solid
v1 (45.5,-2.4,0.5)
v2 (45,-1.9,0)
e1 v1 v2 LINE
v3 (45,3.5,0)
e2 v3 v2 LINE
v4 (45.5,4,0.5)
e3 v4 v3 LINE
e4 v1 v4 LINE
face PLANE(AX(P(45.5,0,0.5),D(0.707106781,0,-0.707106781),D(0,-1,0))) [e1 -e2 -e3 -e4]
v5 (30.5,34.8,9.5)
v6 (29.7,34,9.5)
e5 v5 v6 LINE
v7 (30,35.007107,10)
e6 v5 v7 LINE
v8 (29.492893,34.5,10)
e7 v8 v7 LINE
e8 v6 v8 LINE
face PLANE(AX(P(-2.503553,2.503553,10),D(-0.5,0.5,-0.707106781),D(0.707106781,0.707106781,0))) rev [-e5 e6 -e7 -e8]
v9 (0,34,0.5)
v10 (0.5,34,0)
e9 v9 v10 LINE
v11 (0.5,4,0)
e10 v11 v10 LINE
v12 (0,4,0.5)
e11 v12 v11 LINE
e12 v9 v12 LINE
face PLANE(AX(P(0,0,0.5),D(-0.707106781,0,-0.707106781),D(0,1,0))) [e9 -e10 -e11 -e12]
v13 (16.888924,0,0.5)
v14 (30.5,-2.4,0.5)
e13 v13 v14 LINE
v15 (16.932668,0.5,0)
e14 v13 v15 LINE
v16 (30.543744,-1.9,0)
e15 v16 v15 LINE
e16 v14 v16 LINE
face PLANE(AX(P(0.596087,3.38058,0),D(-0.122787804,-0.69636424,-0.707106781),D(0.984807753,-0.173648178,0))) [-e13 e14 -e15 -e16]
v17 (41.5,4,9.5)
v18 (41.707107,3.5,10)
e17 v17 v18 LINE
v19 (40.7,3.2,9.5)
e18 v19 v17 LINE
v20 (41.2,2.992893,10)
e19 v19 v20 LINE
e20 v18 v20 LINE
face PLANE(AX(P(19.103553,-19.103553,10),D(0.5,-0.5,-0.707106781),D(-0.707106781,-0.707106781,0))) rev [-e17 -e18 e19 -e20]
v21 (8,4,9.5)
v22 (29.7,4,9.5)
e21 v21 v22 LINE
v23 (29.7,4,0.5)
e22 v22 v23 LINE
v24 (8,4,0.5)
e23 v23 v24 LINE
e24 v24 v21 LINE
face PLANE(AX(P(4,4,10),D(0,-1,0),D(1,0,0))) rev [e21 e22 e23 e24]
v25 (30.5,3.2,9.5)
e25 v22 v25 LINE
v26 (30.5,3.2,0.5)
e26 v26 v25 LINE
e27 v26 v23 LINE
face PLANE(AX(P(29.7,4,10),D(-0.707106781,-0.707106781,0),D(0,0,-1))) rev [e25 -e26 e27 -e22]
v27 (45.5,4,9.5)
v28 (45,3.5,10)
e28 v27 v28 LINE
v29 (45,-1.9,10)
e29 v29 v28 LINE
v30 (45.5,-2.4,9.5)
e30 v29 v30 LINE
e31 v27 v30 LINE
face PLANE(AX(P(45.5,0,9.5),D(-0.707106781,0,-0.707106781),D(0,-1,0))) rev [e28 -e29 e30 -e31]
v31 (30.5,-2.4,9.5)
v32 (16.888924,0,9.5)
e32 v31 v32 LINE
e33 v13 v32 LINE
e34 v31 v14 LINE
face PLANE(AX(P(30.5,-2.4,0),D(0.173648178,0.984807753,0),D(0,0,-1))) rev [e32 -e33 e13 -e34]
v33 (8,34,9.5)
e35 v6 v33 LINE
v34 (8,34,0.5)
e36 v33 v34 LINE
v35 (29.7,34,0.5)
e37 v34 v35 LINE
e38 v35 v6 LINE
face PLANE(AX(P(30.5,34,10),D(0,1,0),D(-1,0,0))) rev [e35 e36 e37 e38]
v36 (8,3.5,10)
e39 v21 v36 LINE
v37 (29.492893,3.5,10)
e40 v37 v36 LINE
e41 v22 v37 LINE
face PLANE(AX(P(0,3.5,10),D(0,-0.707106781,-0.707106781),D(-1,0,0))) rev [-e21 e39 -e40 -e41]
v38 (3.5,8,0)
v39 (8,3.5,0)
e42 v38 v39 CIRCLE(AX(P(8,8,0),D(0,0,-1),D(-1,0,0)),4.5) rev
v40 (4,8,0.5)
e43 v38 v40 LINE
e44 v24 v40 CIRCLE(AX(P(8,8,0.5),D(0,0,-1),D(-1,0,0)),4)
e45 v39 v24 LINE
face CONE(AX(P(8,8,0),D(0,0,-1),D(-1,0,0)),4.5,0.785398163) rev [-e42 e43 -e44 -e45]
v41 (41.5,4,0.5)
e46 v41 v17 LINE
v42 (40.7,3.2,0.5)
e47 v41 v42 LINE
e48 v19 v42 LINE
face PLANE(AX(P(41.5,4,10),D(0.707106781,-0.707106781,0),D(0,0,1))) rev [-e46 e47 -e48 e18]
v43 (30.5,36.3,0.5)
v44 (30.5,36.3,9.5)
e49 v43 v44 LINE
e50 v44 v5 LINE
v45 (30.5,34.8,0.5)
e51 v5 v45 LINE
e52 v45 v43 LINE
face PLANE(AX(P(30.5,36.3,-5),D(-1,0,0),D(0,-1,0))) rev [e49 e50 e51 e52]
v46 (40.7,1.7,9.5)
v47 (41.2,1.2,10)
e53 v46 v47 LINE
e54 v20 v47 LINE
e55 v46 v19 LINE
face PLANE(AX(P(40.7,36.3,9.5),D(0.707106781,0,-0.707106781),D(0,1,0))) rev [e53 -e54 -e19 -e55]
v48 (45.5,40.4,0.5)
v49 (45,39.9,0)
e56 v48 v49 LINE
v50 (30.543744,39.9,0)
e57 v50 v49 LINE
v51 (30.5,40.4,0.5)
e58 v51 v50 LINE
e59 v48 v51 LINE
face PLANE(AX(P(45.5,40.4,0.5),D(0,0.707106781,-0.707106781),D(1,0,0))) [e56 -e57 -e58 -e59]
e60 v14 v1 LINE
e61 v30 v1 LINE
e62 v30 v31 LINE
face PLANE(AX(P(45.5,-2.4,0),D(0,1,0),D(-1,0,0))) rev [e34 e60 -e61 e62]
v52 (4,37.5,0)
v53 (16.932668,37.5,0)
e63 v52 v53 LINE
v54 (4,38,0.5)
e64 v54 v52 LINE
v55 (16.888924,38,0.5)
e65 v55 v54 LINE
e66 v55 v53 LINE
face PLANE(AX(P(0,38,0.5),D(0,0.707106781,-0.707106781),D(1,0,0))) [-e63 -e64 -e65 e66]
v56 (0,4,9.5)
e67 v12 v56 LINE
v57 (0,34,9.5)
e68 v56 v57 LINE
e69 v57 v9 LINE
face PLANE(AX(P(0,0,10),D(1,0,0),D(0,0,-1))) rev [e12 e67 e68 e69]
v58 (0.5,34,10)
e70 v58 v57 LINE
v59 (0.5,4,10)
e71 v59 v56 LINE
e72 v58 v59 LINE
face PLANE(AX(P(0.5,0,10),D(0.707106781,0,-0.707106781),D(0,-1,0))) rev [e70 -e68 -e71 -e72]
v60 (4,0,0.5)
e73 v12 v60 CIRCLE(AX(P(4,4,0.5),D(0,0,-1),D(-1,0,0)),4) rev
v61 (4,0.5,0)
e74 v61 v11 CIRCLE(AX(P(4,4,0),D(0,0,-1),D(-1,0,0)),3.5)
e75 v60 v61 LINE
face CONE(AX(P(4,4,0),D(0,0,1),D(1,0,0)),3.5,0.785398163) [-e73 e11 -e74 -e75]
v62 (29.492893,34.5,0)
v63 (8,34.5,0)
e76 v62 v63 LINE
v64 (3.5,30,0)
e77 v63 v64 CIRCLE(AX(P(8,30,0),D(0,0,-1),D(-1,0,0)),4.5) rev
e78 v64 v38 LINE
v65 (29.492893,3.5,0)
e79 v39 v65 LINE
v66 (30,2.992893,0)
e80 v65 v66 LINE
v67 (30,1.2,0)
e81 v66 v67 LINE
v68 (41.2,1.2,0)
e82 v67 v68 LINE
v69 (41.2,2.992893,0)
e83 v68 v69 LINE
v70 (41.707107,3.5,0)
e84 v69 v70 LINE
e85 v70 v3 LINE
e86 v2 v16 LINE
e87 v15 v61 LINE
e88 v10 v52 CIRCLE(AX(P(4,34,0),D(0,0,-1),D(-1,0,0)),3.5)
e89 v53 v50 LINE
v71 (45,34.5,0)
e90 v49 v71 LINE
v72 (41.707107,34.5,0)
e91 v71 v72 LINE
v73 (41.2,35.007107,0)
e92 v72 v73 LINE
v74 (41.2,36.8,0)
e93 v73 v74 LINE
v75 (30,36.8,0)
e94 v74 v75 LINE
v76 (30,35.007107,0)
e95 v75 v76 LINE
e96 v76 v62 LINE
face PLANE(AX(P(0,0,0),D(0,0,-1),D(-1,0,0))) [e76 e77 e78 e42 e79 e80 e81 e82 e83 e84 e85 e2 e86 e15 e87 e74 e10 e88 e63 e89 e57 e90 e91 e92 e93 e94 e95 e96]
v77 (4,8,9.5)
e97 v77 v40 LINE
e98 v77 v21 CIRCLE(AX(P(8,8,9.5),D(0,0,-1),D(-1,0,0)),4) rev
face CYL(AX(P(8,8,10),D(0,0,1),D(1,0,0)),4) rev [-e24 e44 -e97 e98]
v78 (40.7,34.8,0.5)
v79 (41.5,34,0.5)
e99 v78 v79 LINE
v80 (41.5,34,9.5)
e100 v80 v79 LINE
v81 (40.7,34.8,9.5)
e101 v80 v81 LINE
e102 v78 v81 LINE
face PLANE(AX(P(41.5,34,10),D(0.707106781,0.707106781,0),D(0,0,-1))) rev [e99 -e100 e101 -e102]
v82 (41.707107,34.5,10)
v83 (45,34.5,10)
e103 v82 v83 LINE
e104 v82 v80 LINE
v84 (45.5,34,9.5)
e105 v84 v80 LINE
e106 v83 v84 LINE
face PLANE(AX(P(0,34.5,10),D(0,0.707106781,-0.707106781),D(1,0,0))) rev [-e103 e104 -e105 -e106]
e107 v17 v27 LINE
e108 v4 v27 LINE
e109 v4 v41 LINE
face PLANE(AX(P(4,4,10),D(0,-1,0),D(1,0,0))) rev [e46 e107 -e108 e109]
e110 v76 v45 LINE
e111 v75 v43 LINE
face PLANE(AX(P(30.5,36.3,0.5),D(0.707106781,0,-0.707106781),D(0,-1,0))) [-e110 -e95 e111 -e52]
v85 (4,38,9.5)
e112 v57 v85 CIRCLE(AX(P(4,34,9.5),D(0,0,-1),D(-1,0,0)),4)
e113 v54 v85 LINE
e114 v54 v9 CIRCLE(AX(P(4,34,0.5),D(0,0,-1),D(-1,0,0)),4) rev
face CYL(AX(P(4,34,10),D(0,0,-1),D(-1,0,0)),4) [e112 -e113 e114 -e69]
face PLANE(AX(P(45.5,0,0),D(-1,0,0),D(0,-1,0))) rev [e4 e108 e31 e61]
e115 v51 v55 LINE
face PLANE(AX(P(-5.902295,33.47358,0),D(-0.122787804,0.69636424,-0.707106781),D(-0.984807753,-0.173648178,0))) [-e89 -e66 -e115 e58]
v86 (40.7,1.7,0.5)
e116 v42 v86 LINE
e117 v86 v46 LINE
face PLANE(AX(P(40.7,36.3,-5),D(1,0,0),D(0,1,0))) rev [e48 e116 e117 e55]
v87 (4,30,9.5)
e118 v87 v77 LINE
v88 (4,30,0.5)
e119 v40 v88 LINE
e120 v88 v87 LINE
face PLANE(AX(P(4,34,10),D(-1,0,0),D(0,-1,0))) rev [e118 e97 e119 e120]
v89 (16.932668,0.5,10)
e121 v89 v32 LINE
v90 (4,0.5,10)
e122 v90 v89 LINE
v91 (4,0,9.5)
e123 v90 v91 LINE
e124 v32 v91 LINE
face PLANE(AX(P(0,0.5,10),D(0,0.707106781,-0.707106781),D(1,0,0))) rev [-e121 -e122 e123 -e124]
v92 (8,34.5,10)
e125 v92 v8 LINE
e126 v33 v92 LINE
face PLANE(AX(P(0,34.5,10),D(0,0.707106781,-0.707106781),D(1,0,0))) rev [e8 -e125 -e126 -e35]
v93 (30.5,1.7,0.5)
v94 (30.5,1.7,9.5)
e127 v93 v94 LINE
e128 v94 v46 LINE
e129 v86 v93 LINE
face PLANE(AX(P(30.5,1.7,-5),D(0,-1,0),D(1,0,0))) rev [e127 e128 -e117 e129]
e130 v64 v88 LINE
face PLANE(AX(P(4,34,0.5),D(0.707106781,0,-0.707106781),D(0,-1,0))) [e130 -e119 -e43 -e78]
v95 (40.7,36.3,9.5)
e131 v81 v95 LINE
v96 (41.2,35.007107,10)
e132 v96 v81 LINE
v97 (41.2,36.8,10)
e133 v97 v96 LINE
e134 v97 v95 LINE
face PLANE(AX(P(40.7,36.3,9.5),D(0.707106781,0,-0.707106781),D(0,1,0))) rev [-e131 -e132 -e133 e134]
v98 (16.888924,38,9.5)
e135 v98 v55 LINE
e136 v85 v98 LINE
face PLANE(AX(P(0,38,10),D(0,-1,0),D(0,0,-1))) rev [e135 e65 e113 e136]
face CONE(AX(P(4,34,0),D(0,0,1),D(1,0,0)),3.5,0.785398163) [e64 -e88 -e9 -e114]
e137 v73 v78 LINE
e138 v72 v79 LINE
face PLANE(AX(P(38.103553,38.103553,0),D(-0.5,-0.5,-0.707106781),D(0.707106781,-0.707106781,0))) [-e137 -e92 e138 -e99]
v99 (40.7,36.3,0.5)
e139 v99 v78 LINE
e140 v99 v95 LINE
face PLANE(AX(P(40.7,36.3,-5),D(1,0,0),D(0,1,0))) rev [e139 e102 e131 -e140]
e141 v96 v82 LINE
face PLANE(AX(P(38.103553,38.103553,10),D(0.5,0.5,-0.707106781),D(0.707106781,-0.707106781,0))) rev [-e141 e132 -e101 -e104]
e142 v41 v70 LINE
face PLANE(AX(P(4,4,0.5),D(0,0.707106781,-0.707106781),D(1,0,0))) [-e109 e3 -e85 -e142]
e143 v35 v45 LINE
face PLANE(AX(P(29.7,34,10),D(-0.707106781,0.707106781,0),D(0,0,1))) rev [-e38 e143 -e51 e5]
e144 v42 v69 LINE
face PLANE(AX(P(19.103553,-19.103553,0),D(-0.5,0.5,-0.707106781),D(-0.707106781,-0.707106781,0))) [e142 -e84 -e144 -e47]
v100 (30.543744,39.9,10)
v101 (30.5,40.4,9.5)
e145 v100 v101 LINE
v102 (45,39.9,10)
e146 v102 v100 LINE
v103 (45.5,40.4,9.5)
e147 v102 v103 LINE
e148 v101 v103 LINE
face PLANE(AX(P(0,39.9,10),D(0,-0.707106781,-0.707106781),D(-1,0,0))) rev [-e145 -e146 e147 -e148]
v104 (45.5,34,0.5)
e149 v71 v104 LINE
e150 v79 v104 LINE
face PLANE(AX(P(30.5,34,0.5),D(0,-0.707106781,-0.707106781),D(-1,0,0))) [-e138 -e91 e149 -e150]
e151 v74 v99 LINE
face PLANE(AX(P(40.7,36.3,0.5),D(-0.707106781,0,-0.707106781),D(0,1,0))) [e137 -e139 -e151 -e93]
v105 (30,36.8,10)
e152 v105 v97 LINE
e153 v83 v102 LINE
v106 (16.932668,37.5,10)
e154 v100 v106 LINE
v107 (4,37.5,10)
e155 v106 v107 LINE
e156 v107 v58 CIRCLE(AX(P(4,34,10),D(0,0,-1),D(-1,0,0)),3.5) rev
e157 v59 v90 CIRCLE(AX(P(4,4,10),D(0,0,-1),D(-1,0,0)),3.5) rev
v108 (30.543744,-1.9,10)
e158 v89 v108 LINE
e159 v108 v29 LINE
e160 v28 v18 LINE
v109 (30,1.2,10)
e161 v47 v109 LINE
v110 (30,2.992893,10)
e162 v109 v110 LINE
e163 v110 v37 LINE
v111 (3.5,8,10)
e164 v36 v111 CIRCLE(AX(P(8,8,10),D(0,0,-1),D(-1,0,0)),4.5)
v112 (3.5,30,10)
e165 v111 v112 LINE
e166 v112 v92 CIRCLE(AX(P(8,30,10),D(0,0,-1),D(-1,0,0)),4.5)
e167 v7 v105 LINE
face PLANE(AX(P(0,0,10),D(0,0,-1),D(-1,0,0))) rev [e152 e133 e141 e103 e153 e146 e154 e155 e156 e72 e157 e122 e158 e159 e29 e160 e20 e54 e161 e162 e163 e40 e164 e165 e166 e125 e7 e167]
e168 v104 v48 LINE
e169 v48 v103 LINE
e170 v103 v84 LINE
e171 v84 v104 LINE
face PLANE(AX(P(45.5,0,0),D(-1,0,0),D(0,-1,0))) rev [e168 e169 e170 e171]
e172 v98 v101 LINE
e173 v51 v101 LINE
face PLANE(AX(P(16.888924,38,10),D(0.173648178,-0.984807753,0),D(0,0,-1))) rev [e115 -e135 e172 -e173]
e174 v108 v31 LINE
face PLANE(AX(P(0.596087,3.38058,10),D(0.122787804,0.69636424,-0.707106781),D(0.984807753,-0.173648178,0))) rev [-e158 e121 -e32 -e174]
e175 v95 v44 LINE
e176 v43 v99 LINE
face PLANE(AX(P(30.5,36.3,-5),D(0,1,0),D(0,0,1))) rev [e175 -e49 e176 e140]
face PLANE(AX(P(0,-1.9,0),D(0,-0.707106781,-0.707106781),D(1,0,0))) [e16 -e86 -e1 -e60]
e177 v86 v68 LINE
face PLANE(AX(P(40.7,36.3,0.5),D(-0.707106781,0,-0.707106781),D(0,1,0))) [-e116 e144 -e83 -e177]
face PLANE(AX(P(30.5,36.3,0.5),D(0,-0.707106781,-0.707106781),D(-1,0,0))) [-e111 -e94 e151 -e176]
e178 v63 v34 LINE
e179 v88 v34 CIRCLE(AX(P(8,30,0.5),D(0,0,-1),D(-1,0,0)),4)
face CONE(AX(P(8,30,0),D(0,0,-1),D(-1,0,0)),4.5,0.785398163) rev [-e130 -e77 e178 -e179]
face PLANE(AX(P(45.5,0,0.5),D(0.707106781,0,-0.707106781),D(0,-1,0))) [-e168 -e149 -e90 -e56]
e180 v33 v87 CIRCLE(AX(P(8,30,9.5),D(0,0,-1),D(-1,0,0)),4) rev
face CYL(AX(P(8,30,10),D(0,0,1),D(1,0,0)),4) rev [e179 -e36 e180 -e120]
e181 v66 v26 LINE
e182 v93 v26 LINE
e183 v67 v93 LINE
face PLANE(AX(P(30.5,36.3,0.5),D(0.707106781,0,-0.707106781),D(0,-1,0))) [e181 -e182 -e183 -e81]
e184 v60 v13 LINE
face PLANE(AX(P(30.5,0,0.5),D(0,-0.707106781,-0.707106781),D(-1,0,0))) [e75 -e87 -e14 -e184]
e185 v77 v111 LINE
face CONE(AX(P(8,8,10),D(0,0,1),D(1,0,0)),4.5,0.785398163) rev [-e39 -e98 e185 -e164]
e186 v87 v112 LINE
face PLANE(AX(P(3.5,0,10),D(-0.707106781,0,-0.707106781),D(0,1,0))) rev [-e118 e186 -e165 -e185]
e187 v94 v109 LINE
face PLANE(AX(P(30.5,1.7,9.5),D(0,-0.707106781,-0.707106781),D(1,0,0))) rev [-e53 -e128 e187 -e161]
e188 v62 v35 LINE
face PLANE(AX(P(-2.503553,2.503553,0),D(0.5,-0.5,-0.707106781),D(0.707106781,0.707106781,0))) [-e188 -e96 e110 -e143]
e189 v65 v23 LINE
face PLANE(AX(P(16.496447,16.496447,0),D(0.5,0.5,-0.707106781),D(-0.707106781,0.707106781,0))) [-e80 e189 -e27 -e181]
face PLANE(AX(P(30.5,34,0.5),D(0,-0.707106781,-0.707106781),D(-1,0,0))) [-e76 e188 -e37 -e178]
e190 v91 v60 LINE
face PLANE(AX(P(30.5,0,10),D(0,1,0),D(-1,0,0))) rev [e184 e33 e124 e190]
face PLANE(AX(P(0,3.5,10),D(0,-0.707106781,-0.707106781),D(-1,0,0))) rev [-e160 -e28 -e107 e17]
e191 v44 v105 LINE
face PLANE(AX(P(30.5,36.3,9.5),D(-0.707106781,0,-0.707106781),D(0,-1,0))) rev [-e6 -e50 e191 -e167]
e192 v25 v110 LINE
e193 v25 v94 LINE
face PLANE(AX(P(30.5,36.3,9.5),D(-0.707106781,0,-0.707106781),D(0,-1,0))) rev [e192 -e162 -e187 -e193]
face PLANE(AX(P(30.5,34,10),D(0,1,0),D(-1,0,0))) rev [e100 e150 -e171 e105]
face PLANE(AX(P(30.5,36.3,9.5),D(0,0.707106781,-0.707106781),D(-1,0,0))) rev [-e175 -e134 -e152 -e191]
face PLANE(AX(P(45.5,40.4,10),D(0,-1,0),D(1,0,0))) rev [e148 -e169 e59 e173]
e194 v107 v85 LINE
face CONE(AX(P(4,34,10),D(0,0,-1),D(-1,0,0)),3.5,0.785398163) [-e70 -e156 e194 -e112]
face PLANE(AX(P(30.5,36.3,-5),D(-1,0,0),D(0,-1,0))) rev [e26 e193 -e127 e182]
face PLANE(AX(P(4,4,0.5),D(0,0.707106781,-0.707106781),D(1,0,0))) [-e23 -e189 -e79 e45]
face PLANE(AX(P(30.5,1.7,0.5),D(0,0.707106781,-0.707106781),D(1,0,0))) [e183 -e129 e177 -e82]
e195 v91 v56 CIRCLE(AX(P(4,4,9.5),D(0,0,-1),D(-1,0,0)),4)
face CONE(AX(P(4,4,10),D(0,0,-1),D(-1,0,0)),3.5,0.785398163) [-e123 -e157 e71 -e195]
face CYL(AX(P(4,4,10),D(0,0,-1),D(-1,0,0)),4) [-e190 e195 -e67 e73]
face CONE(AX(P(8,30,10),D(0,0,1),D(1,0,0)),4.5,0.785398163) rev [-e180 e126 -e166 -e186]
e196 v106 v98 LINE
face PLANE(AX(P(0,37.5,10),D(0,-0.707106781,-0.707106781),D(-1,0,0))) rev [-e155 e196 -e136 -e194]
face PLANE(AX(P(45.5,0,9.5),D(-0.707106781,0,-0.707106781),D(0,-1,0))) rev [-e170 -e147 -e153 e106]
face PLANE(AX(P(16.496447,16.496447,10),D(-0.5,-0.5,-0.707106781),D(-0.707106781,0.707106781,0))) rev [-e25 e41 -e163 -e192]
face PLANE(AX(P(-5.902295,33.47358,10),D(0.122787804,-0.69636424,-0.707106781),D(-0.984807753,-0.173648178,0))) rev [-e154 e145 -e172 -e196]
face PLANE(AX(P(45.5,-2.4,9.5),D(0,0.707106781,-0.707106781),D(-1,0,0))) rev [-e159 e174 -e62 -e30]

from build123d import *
from OCP.BRepFilletAPI import BRepFilletAPI_MakeChamfer

# Parameters (mm, degrees)
BOSS_EXTRUDE1_DEPTH = 10
FILLET1_R           = 4
SKETCH3_W           = 10
SKETCH3_H           = 6.4
BOSS_EXTRUDE2_DEPTH = 15
SKETCH5_W           = 10.2
SKETCH5_H           = 34.6
CUT_EXTRUDE1_DEPTH  = 15
CHAMFER2_SIZE       = 13.611076367
CHAMFER2_SIZE_2     = 2.4
CHAMFER3_SIZE       = 0.8
CHAMFER1_SIZE       = 0.5


# Some blends are built 0.0001 mm under size
with BuildPart() as part:
    # Sketch1 → Boss-Extrude1 (new body)
    with BuildSketch(Plane.XY):
        Polygon((0, 0), (0, 38), (30.5, 38), (30.5, 34), (4, 34), (4, 4), (30.5, 4), (30.5, 0), align=None)
    extrude(amount=BOSS_EXTRUDE1_DEPTH)

    # Fillet1
    fillet1_edges = [part.edges().sort_by_distance(p)[0] for p in [
        (0, 0, 5),
        (0, 38, 5),
        (4, 34, 5),
        (4, 4, 5),
    ]]
    fillet(fillet1_edges, radius=FILLET1_R)

    # Sketch3 → Boss-Extrude2 (add)
    with BuildSketch(Plane(origin=(30.5, 0, 0), x_dir=(0, 0, -1), z_dir=(1, 0, 0))):
        with Locations((-5, 37.2)):
            Rectangle(SKETCH3_W, SKETCH3_H)
        with Locations((-5, 0.8)):
            Rectangle(SKETCH3_W, SKETCH3_H)
    extrude(amount=BOSS_EXTRUDE2_DEPTH)

    # Sketch5 → Cut-Extrude1 (cut)
    with BuildSketch(Plane.XY.offset(10)):
        with Locations((35.6, 19)):
            Rectangle(SKETCH5_W, SKETCH5_H)
    extrude(amount=-CUT_EXTRUDE1_DEPTH, mode=Mode.SUBTRACT)

    # Chamfer2
    chamfer2_edges_1 = [part.edges().sort_by_distance(p)[0] for p in [
        (30.5, 0, 5),
    ]]
    chamfer2_side_1 = [part.faces().sort_by_distance(p)[0] for p in [
        (30.452, 0, 5),
    ]]
    chamfer2_edges_2 = [part.edges().sort_by_distance(p)[0] for p in [
        (30.5, 38, 5),
    ]]
    chamfer2_side_2 = [part.faces().sort_by_distance(p)[0] for p in [
        (30.5, 38.048, 5),
    ]]
    chamfer2 = BRepFilletAPI_MakeChamfer(part.part.solid().wrapped)
    for e in chamfer2_edges_1:
        chamfer2.Add(CHAMFER2_SIZE - 0.0001, CHAMFER2_SIZE_2 - 0.0001, e.wrapped, chamfer2_side_1[0].wrapped)
    for e in chamfer2_edges_2:
        chamfer2.Add(CHAMFER2_SIZE_2 - 0.0001, CHAMFER2_SIZE - 0.0001, e.wrapped, chamfer2_side_2[0].wrapped)
    add(Compound.cast(chamfer2.Shape()), mode=Mode.REPLACE)  # a hair under: the kernel refuses the full size

    # Chamfer3
    chamfer3_edges = [part.edges().sort_by_distance(p)[0] for p in [
        (30.5, 4, 5),
        (30.5, 34, 5),
        (40.7, 34, 5),
        (40.7, 4, 5),
    ]]
    chamfer(chamfer3_edges, length=CHAMFER3_SIZE)

    # Chamfer1
    # the kernel refuses this chamfer: 0.5 mm, written as the material it takes off along each edge
    with BuildSketch(Plane(origin=(46.785841494, 4, 10), x_dir=(0, 0, -1), z_dir=(-1, 0, 0)), Plane(origin=(40.214158506, 34, 10), x_dir=(0, 0, -1), z_dir=(1, 0, 0))) as chamfer1_piece_1:
        Polygon((CHAMFER1_SIZE, 0), (0, CHAMFER1_SIZE), (0, 0), align=None)
    extrude(amount=6.571682988, mode=Mode.SUBTRACT)
    with BuildSketch(Plane(origin=(4, 38, 0), x_dir=(0, -1, 0), z_dir=(1, 0, 0))) as chamfer1_piece_2_section:
        Polygon((CHAMFER1_SIZE, 0), (0, -CHAMFER1_SIZE), (0, 0), align=None)
    chamfer1_piece_2 = extrude(amount=14.174865127, mode=Mode.PRIVATE)
    chamfer1_piece_2 = split(chamfer1_piece_2, bisect_by=Plane(origin=(4.237723472, 36.651756922, 1.369040484), z_dir=(-0.1227837169605106, 0.6963649609575091, -0.7071067811865536)), keep=Keep.TOP, mode=Mode.PRIVATE)
    add(chamfer1_piece_2, mode=Mode.SUBTRACT)
    with BuildSketch(Plane(origin=(4, 38, 10), x_dir=(0, 0, -1), z_dir=(1, 0, 0))) as chamfer1_piece_3_section:
        Polygon((CHAMFER1_SIZE, 0), (0, -CHAMFER1_SIZE), (0, 0), align=None)
    chamfer1_piece_3 = extrude(amount=14.174865127, mode=Mode.PRIVATE)
    chamfer1_piece_3 = split(chamfer1_piece_3, bisect_by=Plane(origin=(4.237723472, 36.651756922, 8.630959516), z_dir=(-0.1227837169605106, 0.6963649609575091, 0.7071067811865536)), keep=Keep.TOP, mode=Mode.PRIVATE)
    add(chamfer1_piece_3, mode=Mode.SUBTRACT)
    with BuildSketch(Plane(origin=(15.62271565, 0.2232766, 0), x_dir=(0.17364239776413462, 0.9848087721475283, 0), z_dir=(0.9848087721475283, -0.17364239776413462, 0))) as chamfer1_piece_4_section:
        Polygon((CHAMFER1_SIZE, 0), (0, CHAMFER1_SIZE), (0, 0), align=None)
    chamfer1_piece_4 = extrude(amount=16.392616302, mode=Mode.PRIVATE)
    chamfer1_piece_4 = split(chamfer1_piece_4, bisect_by=Plane(origin=(15.62271565, 0.3616383, 0.1383617), z_dir=(0, -0.7071067811865471, -0.7071067811865479)), keep=Keep.TOP, mode=Mode.PRIVATE)
    add(chamfer1_piece_4, mode=Mode.SUBTRACT)
    with BuildSketch(Plane(origin=(15.62271565, 0.2232766, 10), x_dir=(0, 0, -1), z_dir=(0.9848087721475283, -0.17364239776413462, 0))) as chamfer1_piece_5_section:
        Polygon((CHAMFER1_SIZE, 0), (0, CHAMFER1_SIZE), (0, 0), align=None)
    chamfer1_piece_5 = extrude(amount=16.392616302, mode=Mode.PRIVATE)
    chamfer1_piece_5 = split(chamfer1_piece_5, bisect_by=Plane(origin=(15.62271565, 0.3616383, 9.8616383), z_dir=(0, -0.7071067811865471, 0.7071067811865479)), keep=Keep.TOP, mode=Mode.PRIVATE)
    add(chamfer1_piece_5, mode=Mode.SUBTRACT)
    with BuildSketch(Plane(origin=(31.766307983, 40.6231766, 0), x_dir=(0.17364239776413495, -0.9848087721475282, 0), z_dir=(-0.9848087721475282, -0.17364239776413493, 0))) as chamfer1_piece_6_section:
        Polygon((CHAMFER1_SIZE, 0), (0, CHAMFER1_SIZE), (0, 0), align=None)
    chamfer1_piece_6 = extrude(amount=16.392616302, mode=Mode.PRIVATE)
    chamfer1_piece_6 = split(chamfer1_piece_6, bisect_by=Plane(origin=(31.766307983, 39.0615883, 1.5615883), z_dir=(0, 0.7071067811865476, -0.7071067811865476)), keep=Keep.TOP, mode=Mode.PRIVATE)
    add(chamfer1_piece_6, mode=Mode.SUBTRACT)
    with BuildSketch(Plane(origin=(31.766307983, 40.6231766, 10), x_dir=(0, 0, -1), z_dir=(-0.9848087721475282, -0.17364239776413493, 0))) as chamfer1_piece_7_section:
        Polygon((CHAMFER1_SIZE, 0), (0, CHAMFER1_SIZE), (0, 0), align=None)
    chamfer1_piece_7 = extrude(amount=16.392616302, mode=Mode.PRIVATE)
    chamfer1_piece_7 = split(chamfer1_piece_7, bisect_by=Plane(origin=(31.766307983, 39.0615883, 8.4384117), z_dir=(0, 0.7071067811865476, 0.7071067811865476)), keep=Keep.TOP, mode=Mode.PRIVATE)
    add(chamfer1_piece_7, mode=Mode.SUBTRACT)
    with BuildSketch(Plane(origin=(40.7, 37.585841494, 10), x_dir=(0, 0, -1), z_dir=(0, -1, 0))) as chamfer1_piece_8_section:
        Polygon((CHAMFER1_SIZE, 0), (0, CHAMFER1_SIZE), (0, 0), align=None)
    chamfer1_piece_8 = extrude(amount=4.071682988, mode=Mode.PRIVATE)
    chamfer1_piece_8 = split(chamfer1_piece_8, bisect_by=Plane(origin=(40.7, 37.192920747, 10.392920747), z_dir=(0, -0.7071067811865476, 0.7071067811865476)), keep=Keep.TOP, mode=Mode.PRIVATE)
    add(chamfer1_piece_8, mode=Mode.SUBTRACT)
    with BuildSketch(Plane(origin=(30.5, 0.414158506, 10), x_dir=(0, 0, -1), z_dir=(0, 1, 0))) as chamfer1_piece_9_section:
        Polygon((CHAMFER1_SIZE, 0), (0, CHAMFER1_SIZE), (0, 0), align=None)
    chamfer1_piece_9 = extrude(amount=4.071682988, mode=Mode.PRIVATE)
    chamfer1_piece_9 = split(chamfer1_piece_9, bisect_by=Plane(origin=(30.5, 0.807079253, 10.392920747), z_dir=(0, 0.7071067811865476, 0.7071067811865476)), keep=Keep.TOP, mode=Mode.PRIVATE)
    add(chamfer1_piece_9, mode=Mode.SUBTRACT)
    with BuildSketch(Plane(origin=(30.985841494, 4, 10), x_dir=(0, 0, -1), z_dir=(-1, 0, 0)), Plane(origin=(8, 34, 10), x_dir=(0, 0, -1), z_dir=(1, 0, 0))) as chamfer1_piece_10:
        Polygon((CHAMFER1_SIZE, 0), (0, CHAMFER1_SIZE), (0, 0), align=None)
    extrude(amount=22.985841494, mode=Mode.SUBTRACT)
    with BuildSketch(Plane(origin=(31.40922724, 35.70922724, 10), x_dir=(0, 0, -1), z_dir=(-0.7071067811865491, -0.707106781186546, 0)), Plane(origin=(42.40922724, 33.09077276, 10), x_dir=(0, 0, -1), z_dir=(-0.7071067811865476, 0.7071067811865476, 0)), Plane(origin=(31.40922724, 35.70922724, 0), x_dir=(-0.7071067811865459, 0.707106781186549, 0), z_dir=(-0.7071067811865491, -0.707106781186546, 0)), Plane(origin=(42.40922724, 33.09077276, 0), x_dir=(0.7071067811865476, 0.7071067811865476, 1.7763568394002363e-15), z_dir=(-0.7071067811865476, 0.7071067811865476, 0))) as chamfer1_piece_11:
        Polygon((CHAMFER1_SIZE, 0), (0, -CHAMFER1_SIZE), (0, 0), align=None)
    extrude(amount=3.703053838, mode=Mode.SUBTRACT)
    with BuildSketch(Plane(origin=(31.40922724, 2.29077276, 10), x_dir=(0, 0, -1), z_dir=(-0.7071067811865479, 0.7071067811865471, 0)), Plane(origin=(42.40922724, 4.90922724, 10), x_dir=(0, 0, -1), z_dir=(-0.7071067811865464, -0.7071067811865487, 0)), Plane(origin=(31.40922724, 2.29077276, 0), x_dir=(-0.7071067811865472, -0.7071067811865479, 0), z_dir=(-0.7071067811865479, 0.7071067811865471, 0)), Plane(origin=(42.40922724, 4.90922724, 0), x_dir=(0.7071067811865486, -0.7071067811865464, 0), z_dir=(-0.7071067811865464, -0.7071067811865487, 0))) as chamfer1_piece_12:
        Polygon((CHAMFER1_SIZE, 0), (0, CHAMFER1_SIZE), (0, 0), align=None)
    extrude(amount=3.703053838, mode=Mode.SUBTRACT)
    with BuildSketch(Plane(origin=(40.7, 0.414158506, 0), x_dir=(1, 0, 0), z_dir=(0, 1, 0))) as chamfer1_piece_13_section:
        Polygon((CHAMFER1_SIZE, 0), (0, -CHAMFER1_SIZE), (0, 0), align=None)
    chamfer1_piece_13 = extrude(amount=4.071682988, mode=Mode.PRIVATE)
    chamfer1_piece_13 = split(chamfer1_piece_13, bisect_by=Plane(origin=(40.7, 0.807079253, -0.392920747), z_dir=(0, 0.7071067811865476, -0.7071067811865476)), keep=Keep.TOP, mode=Mode.PRIVATE)
    add(chamfer1_piece_13, mode=Mode.SUBTRACT)
    with BuildSketch(Plane(origin=(30.5, 37.585841494, 0), x_dir=(-1, 0, 0), z_dir=(0, -1, 0))) as chamfer1_piece_14_section:
        Polygon((CHAMFER1_SIZE, 0), (0, -CHAMFER1_SIZE), (0, 0), align=None)
    chamfer1_piece_14 = extrude(amount=4.071682988, mode=Mode.PRIVATE)
    chamfer1_piece_14 = split(chamfer1_piece_14, bisect_by=Plane(origin=(30.5, 37.192920747, -0.392920747), z_dir=(0, -0.7071067811865476, -0.7071067811865476)), keep=Keep.TOP, mode=Mode.PRIVATE)
    add(chamfer1_piece_14, mode=Mode.SUBTRACT)
    with BuildSketch(Plane(origin=(8, 4, 0), x_dir=(0, -1, 0), z_dir=(1, 0, 0)), Plane(origin=(30.985841494, 34, 0), x_dir=(0, 1, 0), z_dir=(-1, 0, 0))) as chamfer1_piece_15:
        Polygon((CHAMFER1_SIZE, 0), (0, -CHAMFER1_SIZE), (0, 0), align=None)
    extrude(amount=22.985841494, mode=Mode.SUBTRACT)
    with BuildSketch(Plane(origin=(46.785841494, 34, 0), x_dir=(0, 1, 0), z_dir=(-1, 0, 0)), Plane(origin=(40.214158506, 4, 0), x_dir=(0, -1, 0), z_dir=(1, 0, 0))) as chamfer1_piece_16:
        Polygon((CHAMFER1_SIZE, 0), (0, -CHAMFER1_SIZE), (0, 0), align=None)
    extrude(amount=6.571682988, mode=Mode.SUBTRACT)
    with BuildSketch(Plane(origin=(4, 30, 0), x_dir=(-1, 0, 0), z_dir=(0, -1, 0)), Plane(origin=(4, 30, 10), x_dir=(0, 0, -1), z_dir=(0, -1, 0))) as chamfer1_piece_17:
        Polygon((CHAMFER1_SIZE, 0), (0, -CHAMFER1_SIZE), (0, 0), align=None)
    extrude(amount=22, mode=Mode.SUBTRACT)
    with BuildSketch(Plane(origin=(0, 4, 0), x_dir=(1, 0, 0), z_dir=(0, 1, 0)), Plane(origin=(0, 4, 10), x_dir=(0, 0, -1), z_dir=(0, 1, 0))) as chamfer1_piece_18:
        Polygon((CHAMFER1_SIZE, 0), (0, -CHAMFER1_SIZE), (0, 0), align=None)
    extrude(amount=30, mode=Mode.SUBTRACT)
    with BuildSketch(Plane(origin=(18.174865127, 0, 0), x_dir=(0, 1, 0), z_dir=(-1, 0, 0))) as chamfer1_piece_19_section:
        Polygon((CHAMFER1_SIZE, 0), (0, -CHAMFER1_SIZE), (0, 0), align=None)
    chamfer1_piece_19 = extrude(amount=14.174865127, mode=Mode.PRIVATE)
    chamfer1_piece_19 = split(chamfer1_piece_19, bisect_by=Plane(origin=(18.198890584, 0.136259816, 0.1383617), z_dir=(-0.12278371696051142, -0.6963649609575149, -0.7071067811865478)), keep=Keep.TOP, mode=Mode.PRIVATE)
    add(chamfer1_piece_19, mode=Mode.SUBTRACT)
    with BuildSketch(Plane(origin=(4, 4, 0), x_dir=(-1, 0, 0), z_dir=(0, 1, 0))) as chamfer1_piece_20:
        Polygon((4 - CHAMFER1_SIZE, 0), (4, CHAMFER1_SIZE), (4, 0), align=None)
    revolve(axis=Axis((4, 4, 0), (0, 0, 1)), revolution_arc=90, mode=Mode.SUBTRACT)
    with BuildSketch(Plane(origin=(4, 34, 0), x_dir=(-1, 0, 0), z_dir=(0, -1, 0))) as chamfer1_piece_21:
        Polygon((4 - CHAMFER1_SIZE, 0), (4, -CHAMFER1_SIZE), (4, 0), align=None)
    revolve(axis=Axis((4, 34, 0), (0, 0, -1)), revolution_arc=90, mode=Mode.SUBTRACT)
    with BuildSketch(Plane(origin=(18.174865127, 0, 10), x_dir=(0, 0, -1), z_dir=(-1, 0, 0))) as chamfer1_piece_22_section:
        Polygon((CHAMFER1_SIZE, 0), (0, -CHAMFER1_SIZE), (0, 0), align=None)
    chamfer1_piece_22 = extrude(amount=14.174865127, mode=Mode.PRIVATE)
    chamfer1_piece_22 = split(chamfer1_piece_22, bisect_by=Plane(origin=(18.198890584, 0.136259816, 9.8616383), z_dir=(-0.12278371696051138, -0.6963649609575147, 0.7071067811865477)), keep=Keep.TOP, mode=Mode.PRIVATE)
    add(chamfer1_piece_22, mode=Mode.SUBTRACT)
    with BuildSketch(Plane(origin=(4, 4, 10), x_dir=(-1, 0, 0), z_dir=(0, 1, 0))) as chamfer1_piece_23:
        Polygon((4, -CHAMFER1_SIZE), (4 - CHAMFER1_SIZE, 0), (4, 0), align=None)
    revolve(axis=Axis((4, 4, 10), (0, 0, 1)), revolution_arc=90, mode=Mode.SUBTRACT)
    with BuildSketch(Plane(origin=(4, 34, 10), x_dir=(-1, 0, 0), z_dir=(0, -1, 0))) as chamfer1_piece_24:
        Polygon((4, CHAMFER1_SIZE), (4 - CHAMFER1_SIZE, 0), (4, 0), align=None)
    revolve(axis=Axis((4, 34, 10), (0, 0, -1)), revolution_arc=90, mode=Mode.SUBTRACT)
    with BuildSketch(Plane(origin=(8, 8, 0), x_dir=(-1, 0, 0), z_dir=(0, 1, 0))) as chamfer1_piece_25:
        Polygon((4 + CHAMFER1_SIZE, 0), (4, CHAMFER1_SIZE), (4, 0), align=None)
    revolve(axis=Axis((8, 8, 0), (0, 0, 1)), revolution_arc=90, mode=Mode.SUBTRACT)
    with BuildSketch(Plane(origin=(8, 8, 10), x_dir=(-1, 0, 0), z_dir=(0, 1, 0))) as chamfer1_piece_26:
        Polygon((4, -CHAMFER1_SIZE), (4 + CHAMFER1_SIZE, 0), (4, 0), align=None)
    revolve(axis=Axis((8, 8, 10), (0, 0, 1)), revolution_arc=90, mode=Mode.SUBTRACT)
    with BuildSketch(Plane(origin=(8, 30, 0), x_dir=(0, 1, 0), z_dir=(1, 0, 0))) as chamfer1_piece_27:
        Polygon((4 + CHAMFER1_SIZE, 0), (4, CHAMFER1_SIZE), (4, 0), align=None)
    revolve(axis=Axis((8, 30, 0), (0, 0, 1)), revolution_arc=90, mode=Mode.SUBTRACT)
    with BuildSketch(Plane(origin=(8, 30, 10), x_dir=(0, 1, 0), z_dir=(1, 0, 0))) as chamfer1_piece_28:
        Polygon((4, -CHAMFER1_SIZE), (4 + CHAMFER1_SIZE, 0), (4, 0), align=None)
    revolve(axis=Axis((8, 30, 10), (0, 0, 1)), revolution_arc=90, mode=Mode.SUBTRACT)
    with BuildSketch(Plane(origin=(29.214158506, 40.4, 10), x_dir=(0, 0, -1), z_dir=(1, 0, 0)), Plane(origin=(29.214158506, 40.4, 0), x_dir=(0, -1, 0), z_dir=(1, 0, 0))) as chamfer1_piece_29:
        Polygon((CHAMFER1_SIZE, 0), (0, -CHAMFER1_SIZE), (0, 0), align=None)
    extrude(amount=17.571682988, mode=Mode.SUBTRACT)
    with BuildSketch(Plane(origin=(45.5, 41.685841494, 10), x_dir=(0, 0, -1), z_dir=(0, -1, 0)), Plane(origin=(45.5, 5.285841494, 10), x_dir=(0, 0, -1), z_dir=(0, -1, 0))) as chamfer1_piece_30:
        Polygon((CHAMFER1_SIZE, 0), (0, -CHAMFER1_SIZE), (0, 0), align=None)
    extrude(amount=8.971682988, mode=Mode.SUBTRACT)
    with BuildSketch(Plane(origin=(45.5, 32.714158506, 0), x_dir=(-1, 0, 0), z_dir=(0, 1, 0)), Plane(origin=(45.5, -3.685841494, 0), x_dir=(-1, 0, 0), z_dir=(0, 1, 0))) as chamfer1_piece_31:
        Polygon((CHAMFER1_SIZE, 0), (0, CHAMFER1_SIZE), (0, 0), align=None)
    extrude(amount=8.971682988, mode=Mode.SUBTRACT)
    with BuildSketch(Plane(origin=(29.214158506, -2.4, 0), x_dir=(0, 1, 0), z_dir=(1, 0, 0)), Plane(origin=(29.214158506, -2.4, 10), x_dir=(0, 0, -1), z_dir=(1, 0, 0))) as chamfer1_piece_32:
        Polygon((CHAMFER1_SIZE, 0), (0, CHAMFER1_SIZE), (0, 0), align=None)
    extrude(amount=17.571682988, mode=Mode.SUBTRACT)
    with BuildSketch(Plane(origin=(29.214158506, 1.7, 0), x_dir=(0, -1, 0), z_dir=(1, 0, 0))) as chamfer1_piece_33_section:
        Polygon((CHAMFER1_SIZE, 0), (0, -CHAMFER1_SIZE), (0, 0), align=None)
    chamfer1_piece_33 = extrude(amount=12.771682988, mode=Mode.PRIVATE)
    chamfer1_piece_33 = split(chamfer1_piece_33, bisect_by=Plane(origin=(35.207079253, 1.7, 5.992920747), z_dir=(-0.7071067811865476, 0, -0.7071067811865476)), keep=Keep.TOP, mode=Mode.PRIVATE)
    chamfer1_piece_33 = split(chamfer1_piece_33, bisect_by=Plane(origin=(29.607079253, 1.7, -0.392920747), z_dir=(0.7071067811865476, 0, -0.7071067811865476)), keep=Keep.TOP, mode=Mode.PRIVATE)
    add(chamfer1_piece_33, mode=Mode.SUBTRACT)
    with BuildSketch(Plane(origin=(30.5, 4.485841494, 0), x_dir=(-1, 0, 0), z_dir=(0, -1, 0))) as chamfer1_piece_34_section:
        Polygon((CHAMFER1_SIZE, 0), (0, -CHAMFER1_SIZE), (0, 0), align=None)
    chamfer1_piece_34 = extrude(amount=4.071682988, mode=Mode.PRIVATE)
    chamfer1_piece_34 = split(chamfer1_piece_34, bisect_by=Plane(origin=(30.5, 2.842920747, 1.642920747), z_dir=(0, 0.7071067811865476, -0.7071067811865476)), keep=Keep.TOP, mode=Mode.PRIVATE)
    add(chamfer1_piece_34, mode=Mode.SUBTRACT)
    with BuildSketch(Plane(origin=(40.7, 33.514158506, 0), x_dir=(1, 0, 0), z_dir=(0, 1, 0))) as chamfer1_piece_35_section:
        Polygon((CHAMFER1_SIZE, 0), (0, -CHAMFER1_SIZE), (0, 0), align=None)
    chamfer1_piece_35 = extrude(amount=4.071682988, mode=Mode.PRIVATE)
    chamfer1_piece_35 = split(chamfer1_piece_35, bisect_by=Plane(origin=(40.7, 35.157079253, 1.642920747), z_dir=(0, -0.7071067811865476, -0.7071067811865476)), keep=Keep.TOP, mode=Mode.PRIVATE)
    add(chamfer1_piece_35, mode=Mode.SUBTRACT)
    with BuildSketch(Plane(origin=(41.985841494, 36.3, 0), x_dir=(0, 1, 0), z_dir=(-1, 0, 0))) as chamfer1_piece_36_section:
        Polygon((CHAMFER1_SIZE, 0), (0, -CHAMFER1_SIZE), (0, 0), align=None)
    chamfer1_piece_36 = extrude(amount=12.771682988, mode=Mode.PRIVATE)
    chamfer1_piece_36 = split(chamfer1_piece_36, bisect_by=Plane(origin=(41.592920747, 36.3, -0.392920747), z_dir=(-0.7071067811865476, 0, -0.7071067811865476)), keep=Keep.TOP, mode=Mode.PRIVATE)
    chamfer1_piece_36 = split(chamfer1_piece_36, bisect_by=Plane(origin=(35.992920747, 36.3, 5.992920747), z_dir=(0.7071067811865476, 0, -0.7071067811865476)), keep=Keep.TOP, mode=Mode.PRIVATE)
    add(chamfer1_piece_36, mode=Mode.SUBTRACT)
    with BuildSketch(Plane(origin=(40.7, 4.485841494, 10), x_dir=(0, 0, -1), z_dir=(0, -1, 0))) as chamfer1_piece_37_section:
        Polygon((CHAMFER1_SIZE, 0), (0, CHAMFER1_SIZE), (0, 0), align=None)
    chamfer1_piece_37 = extrude(amount=4.071682988, mode=Mode.PRIVATE)
    chamfer1_piece_37 = split(chamfer1_piece_37, bisect_by=Plane(origin=(40.7, 2.842920747, 8.357079253), z_dir=(0, 0.7071067811865476, 0.7071067811865476)), keep=Keep.TOP, mode=Mode.PRIVATE)
    add(chamfer1_piece_37, mode=Mode.SUBTRACT)
    with BuildSketch(Plane(origin=(41.985841494, 1.7, 10), x_dir=(0, 0, -1), z_dir=(-1, 0, 0))) as chamfer1_piece_38_section:
        Polygon((CHAMFER1_SIZE, 0), (0, CHAMFER1_SIZE), (0, 0), align=None)
    chamfer1_piece_38 = extrude(amount=12.771682988, mode=Mode.PRIVATE)
    chamfer1_piece_38 = split(chamfer1_piece_38, bisect_by=Plane(origin=(35.992920747, 1.7, 4.007079253), z_dir=(0.7071067811865476, 0, 0.7071067811865476)), keep=Keep.TOP, mode=Mode.PRIVATE)
    chamfer1_piece_38 = split(chamfer1_piece_38, bisect_by=Plane(origin=(41.592920747, 1.7, 10.392920747), z_dir=(-0.7071067811865476, 0, 0.7071067811865476)), keep=Keep.TOP, mode=Mode.PRIVATE)
    add(chamfer1_piece_38, mode=Mode.SUBTRACT)
    with BuildSketch(Plane(origin=(30.5, 33.514158506, 10), x_dir=(0, 0, -1), z_dir=(0, 1, 0))) as chamfer1_piece_39_section:
        Polygon((CHAMFER1_SIZE, 0), (0, CHAMFER1_SIZE), (0, 0), align=None)
    chamfer1_piece_39 = extrude(amount=4.071682988, mode=Mode.PRIVATE)
    chamfer1_piece_39 = split(chamfer1_piece_39, bisect_by=Plane(origin=(30.5, 35.157079253, 8.357079253), z_dir=(0, -0.7071067811865476, 0.7071067811865476)), keep=Keep.TOP, mode=Mode.PRIVATE)
    add(chamfer1_piece_39, mode=Mode.SUBTRACT)
    with BuildSketch(Plane(origin=(29.214158506, 36.3, 10), x_dir=(0, 0, -1), z_dir=(1, 0, 0))) as chamfer1_piece_40_section:
        Polygon((CHAMFER1_SIZE, 0), (0, CHAMFER1_SIZE), (0, 0), align=None)
    chamfer1_piece_40 = extrude(amount=12.771682988, mode=Mode.PRIVATE)
    chamfer1_piece_40 = split(chamfer1_piece_40, bisect_by=Plane(origin=(35.207079253, 36.3, 4.007079253), z_dir=(-0.7071067811865476, 0, 0.7071067811865476)), keep=Keep.TOP, mode=Mode.PRIVATE)
    chamfer1_piece_40 = split(chamfer1_piece_40, bisect_by=Plane(origin=(29.607079253, 36.3, 10.392920747), z_dir=(0.7071067811865476, 0, 0.7071067811865476)), keep=Keep.TOP, mode=Mode.PRIVATE)
    add(chamfer1_piece_40, mode=Mode.SUBTRACT)


solid = part.part
